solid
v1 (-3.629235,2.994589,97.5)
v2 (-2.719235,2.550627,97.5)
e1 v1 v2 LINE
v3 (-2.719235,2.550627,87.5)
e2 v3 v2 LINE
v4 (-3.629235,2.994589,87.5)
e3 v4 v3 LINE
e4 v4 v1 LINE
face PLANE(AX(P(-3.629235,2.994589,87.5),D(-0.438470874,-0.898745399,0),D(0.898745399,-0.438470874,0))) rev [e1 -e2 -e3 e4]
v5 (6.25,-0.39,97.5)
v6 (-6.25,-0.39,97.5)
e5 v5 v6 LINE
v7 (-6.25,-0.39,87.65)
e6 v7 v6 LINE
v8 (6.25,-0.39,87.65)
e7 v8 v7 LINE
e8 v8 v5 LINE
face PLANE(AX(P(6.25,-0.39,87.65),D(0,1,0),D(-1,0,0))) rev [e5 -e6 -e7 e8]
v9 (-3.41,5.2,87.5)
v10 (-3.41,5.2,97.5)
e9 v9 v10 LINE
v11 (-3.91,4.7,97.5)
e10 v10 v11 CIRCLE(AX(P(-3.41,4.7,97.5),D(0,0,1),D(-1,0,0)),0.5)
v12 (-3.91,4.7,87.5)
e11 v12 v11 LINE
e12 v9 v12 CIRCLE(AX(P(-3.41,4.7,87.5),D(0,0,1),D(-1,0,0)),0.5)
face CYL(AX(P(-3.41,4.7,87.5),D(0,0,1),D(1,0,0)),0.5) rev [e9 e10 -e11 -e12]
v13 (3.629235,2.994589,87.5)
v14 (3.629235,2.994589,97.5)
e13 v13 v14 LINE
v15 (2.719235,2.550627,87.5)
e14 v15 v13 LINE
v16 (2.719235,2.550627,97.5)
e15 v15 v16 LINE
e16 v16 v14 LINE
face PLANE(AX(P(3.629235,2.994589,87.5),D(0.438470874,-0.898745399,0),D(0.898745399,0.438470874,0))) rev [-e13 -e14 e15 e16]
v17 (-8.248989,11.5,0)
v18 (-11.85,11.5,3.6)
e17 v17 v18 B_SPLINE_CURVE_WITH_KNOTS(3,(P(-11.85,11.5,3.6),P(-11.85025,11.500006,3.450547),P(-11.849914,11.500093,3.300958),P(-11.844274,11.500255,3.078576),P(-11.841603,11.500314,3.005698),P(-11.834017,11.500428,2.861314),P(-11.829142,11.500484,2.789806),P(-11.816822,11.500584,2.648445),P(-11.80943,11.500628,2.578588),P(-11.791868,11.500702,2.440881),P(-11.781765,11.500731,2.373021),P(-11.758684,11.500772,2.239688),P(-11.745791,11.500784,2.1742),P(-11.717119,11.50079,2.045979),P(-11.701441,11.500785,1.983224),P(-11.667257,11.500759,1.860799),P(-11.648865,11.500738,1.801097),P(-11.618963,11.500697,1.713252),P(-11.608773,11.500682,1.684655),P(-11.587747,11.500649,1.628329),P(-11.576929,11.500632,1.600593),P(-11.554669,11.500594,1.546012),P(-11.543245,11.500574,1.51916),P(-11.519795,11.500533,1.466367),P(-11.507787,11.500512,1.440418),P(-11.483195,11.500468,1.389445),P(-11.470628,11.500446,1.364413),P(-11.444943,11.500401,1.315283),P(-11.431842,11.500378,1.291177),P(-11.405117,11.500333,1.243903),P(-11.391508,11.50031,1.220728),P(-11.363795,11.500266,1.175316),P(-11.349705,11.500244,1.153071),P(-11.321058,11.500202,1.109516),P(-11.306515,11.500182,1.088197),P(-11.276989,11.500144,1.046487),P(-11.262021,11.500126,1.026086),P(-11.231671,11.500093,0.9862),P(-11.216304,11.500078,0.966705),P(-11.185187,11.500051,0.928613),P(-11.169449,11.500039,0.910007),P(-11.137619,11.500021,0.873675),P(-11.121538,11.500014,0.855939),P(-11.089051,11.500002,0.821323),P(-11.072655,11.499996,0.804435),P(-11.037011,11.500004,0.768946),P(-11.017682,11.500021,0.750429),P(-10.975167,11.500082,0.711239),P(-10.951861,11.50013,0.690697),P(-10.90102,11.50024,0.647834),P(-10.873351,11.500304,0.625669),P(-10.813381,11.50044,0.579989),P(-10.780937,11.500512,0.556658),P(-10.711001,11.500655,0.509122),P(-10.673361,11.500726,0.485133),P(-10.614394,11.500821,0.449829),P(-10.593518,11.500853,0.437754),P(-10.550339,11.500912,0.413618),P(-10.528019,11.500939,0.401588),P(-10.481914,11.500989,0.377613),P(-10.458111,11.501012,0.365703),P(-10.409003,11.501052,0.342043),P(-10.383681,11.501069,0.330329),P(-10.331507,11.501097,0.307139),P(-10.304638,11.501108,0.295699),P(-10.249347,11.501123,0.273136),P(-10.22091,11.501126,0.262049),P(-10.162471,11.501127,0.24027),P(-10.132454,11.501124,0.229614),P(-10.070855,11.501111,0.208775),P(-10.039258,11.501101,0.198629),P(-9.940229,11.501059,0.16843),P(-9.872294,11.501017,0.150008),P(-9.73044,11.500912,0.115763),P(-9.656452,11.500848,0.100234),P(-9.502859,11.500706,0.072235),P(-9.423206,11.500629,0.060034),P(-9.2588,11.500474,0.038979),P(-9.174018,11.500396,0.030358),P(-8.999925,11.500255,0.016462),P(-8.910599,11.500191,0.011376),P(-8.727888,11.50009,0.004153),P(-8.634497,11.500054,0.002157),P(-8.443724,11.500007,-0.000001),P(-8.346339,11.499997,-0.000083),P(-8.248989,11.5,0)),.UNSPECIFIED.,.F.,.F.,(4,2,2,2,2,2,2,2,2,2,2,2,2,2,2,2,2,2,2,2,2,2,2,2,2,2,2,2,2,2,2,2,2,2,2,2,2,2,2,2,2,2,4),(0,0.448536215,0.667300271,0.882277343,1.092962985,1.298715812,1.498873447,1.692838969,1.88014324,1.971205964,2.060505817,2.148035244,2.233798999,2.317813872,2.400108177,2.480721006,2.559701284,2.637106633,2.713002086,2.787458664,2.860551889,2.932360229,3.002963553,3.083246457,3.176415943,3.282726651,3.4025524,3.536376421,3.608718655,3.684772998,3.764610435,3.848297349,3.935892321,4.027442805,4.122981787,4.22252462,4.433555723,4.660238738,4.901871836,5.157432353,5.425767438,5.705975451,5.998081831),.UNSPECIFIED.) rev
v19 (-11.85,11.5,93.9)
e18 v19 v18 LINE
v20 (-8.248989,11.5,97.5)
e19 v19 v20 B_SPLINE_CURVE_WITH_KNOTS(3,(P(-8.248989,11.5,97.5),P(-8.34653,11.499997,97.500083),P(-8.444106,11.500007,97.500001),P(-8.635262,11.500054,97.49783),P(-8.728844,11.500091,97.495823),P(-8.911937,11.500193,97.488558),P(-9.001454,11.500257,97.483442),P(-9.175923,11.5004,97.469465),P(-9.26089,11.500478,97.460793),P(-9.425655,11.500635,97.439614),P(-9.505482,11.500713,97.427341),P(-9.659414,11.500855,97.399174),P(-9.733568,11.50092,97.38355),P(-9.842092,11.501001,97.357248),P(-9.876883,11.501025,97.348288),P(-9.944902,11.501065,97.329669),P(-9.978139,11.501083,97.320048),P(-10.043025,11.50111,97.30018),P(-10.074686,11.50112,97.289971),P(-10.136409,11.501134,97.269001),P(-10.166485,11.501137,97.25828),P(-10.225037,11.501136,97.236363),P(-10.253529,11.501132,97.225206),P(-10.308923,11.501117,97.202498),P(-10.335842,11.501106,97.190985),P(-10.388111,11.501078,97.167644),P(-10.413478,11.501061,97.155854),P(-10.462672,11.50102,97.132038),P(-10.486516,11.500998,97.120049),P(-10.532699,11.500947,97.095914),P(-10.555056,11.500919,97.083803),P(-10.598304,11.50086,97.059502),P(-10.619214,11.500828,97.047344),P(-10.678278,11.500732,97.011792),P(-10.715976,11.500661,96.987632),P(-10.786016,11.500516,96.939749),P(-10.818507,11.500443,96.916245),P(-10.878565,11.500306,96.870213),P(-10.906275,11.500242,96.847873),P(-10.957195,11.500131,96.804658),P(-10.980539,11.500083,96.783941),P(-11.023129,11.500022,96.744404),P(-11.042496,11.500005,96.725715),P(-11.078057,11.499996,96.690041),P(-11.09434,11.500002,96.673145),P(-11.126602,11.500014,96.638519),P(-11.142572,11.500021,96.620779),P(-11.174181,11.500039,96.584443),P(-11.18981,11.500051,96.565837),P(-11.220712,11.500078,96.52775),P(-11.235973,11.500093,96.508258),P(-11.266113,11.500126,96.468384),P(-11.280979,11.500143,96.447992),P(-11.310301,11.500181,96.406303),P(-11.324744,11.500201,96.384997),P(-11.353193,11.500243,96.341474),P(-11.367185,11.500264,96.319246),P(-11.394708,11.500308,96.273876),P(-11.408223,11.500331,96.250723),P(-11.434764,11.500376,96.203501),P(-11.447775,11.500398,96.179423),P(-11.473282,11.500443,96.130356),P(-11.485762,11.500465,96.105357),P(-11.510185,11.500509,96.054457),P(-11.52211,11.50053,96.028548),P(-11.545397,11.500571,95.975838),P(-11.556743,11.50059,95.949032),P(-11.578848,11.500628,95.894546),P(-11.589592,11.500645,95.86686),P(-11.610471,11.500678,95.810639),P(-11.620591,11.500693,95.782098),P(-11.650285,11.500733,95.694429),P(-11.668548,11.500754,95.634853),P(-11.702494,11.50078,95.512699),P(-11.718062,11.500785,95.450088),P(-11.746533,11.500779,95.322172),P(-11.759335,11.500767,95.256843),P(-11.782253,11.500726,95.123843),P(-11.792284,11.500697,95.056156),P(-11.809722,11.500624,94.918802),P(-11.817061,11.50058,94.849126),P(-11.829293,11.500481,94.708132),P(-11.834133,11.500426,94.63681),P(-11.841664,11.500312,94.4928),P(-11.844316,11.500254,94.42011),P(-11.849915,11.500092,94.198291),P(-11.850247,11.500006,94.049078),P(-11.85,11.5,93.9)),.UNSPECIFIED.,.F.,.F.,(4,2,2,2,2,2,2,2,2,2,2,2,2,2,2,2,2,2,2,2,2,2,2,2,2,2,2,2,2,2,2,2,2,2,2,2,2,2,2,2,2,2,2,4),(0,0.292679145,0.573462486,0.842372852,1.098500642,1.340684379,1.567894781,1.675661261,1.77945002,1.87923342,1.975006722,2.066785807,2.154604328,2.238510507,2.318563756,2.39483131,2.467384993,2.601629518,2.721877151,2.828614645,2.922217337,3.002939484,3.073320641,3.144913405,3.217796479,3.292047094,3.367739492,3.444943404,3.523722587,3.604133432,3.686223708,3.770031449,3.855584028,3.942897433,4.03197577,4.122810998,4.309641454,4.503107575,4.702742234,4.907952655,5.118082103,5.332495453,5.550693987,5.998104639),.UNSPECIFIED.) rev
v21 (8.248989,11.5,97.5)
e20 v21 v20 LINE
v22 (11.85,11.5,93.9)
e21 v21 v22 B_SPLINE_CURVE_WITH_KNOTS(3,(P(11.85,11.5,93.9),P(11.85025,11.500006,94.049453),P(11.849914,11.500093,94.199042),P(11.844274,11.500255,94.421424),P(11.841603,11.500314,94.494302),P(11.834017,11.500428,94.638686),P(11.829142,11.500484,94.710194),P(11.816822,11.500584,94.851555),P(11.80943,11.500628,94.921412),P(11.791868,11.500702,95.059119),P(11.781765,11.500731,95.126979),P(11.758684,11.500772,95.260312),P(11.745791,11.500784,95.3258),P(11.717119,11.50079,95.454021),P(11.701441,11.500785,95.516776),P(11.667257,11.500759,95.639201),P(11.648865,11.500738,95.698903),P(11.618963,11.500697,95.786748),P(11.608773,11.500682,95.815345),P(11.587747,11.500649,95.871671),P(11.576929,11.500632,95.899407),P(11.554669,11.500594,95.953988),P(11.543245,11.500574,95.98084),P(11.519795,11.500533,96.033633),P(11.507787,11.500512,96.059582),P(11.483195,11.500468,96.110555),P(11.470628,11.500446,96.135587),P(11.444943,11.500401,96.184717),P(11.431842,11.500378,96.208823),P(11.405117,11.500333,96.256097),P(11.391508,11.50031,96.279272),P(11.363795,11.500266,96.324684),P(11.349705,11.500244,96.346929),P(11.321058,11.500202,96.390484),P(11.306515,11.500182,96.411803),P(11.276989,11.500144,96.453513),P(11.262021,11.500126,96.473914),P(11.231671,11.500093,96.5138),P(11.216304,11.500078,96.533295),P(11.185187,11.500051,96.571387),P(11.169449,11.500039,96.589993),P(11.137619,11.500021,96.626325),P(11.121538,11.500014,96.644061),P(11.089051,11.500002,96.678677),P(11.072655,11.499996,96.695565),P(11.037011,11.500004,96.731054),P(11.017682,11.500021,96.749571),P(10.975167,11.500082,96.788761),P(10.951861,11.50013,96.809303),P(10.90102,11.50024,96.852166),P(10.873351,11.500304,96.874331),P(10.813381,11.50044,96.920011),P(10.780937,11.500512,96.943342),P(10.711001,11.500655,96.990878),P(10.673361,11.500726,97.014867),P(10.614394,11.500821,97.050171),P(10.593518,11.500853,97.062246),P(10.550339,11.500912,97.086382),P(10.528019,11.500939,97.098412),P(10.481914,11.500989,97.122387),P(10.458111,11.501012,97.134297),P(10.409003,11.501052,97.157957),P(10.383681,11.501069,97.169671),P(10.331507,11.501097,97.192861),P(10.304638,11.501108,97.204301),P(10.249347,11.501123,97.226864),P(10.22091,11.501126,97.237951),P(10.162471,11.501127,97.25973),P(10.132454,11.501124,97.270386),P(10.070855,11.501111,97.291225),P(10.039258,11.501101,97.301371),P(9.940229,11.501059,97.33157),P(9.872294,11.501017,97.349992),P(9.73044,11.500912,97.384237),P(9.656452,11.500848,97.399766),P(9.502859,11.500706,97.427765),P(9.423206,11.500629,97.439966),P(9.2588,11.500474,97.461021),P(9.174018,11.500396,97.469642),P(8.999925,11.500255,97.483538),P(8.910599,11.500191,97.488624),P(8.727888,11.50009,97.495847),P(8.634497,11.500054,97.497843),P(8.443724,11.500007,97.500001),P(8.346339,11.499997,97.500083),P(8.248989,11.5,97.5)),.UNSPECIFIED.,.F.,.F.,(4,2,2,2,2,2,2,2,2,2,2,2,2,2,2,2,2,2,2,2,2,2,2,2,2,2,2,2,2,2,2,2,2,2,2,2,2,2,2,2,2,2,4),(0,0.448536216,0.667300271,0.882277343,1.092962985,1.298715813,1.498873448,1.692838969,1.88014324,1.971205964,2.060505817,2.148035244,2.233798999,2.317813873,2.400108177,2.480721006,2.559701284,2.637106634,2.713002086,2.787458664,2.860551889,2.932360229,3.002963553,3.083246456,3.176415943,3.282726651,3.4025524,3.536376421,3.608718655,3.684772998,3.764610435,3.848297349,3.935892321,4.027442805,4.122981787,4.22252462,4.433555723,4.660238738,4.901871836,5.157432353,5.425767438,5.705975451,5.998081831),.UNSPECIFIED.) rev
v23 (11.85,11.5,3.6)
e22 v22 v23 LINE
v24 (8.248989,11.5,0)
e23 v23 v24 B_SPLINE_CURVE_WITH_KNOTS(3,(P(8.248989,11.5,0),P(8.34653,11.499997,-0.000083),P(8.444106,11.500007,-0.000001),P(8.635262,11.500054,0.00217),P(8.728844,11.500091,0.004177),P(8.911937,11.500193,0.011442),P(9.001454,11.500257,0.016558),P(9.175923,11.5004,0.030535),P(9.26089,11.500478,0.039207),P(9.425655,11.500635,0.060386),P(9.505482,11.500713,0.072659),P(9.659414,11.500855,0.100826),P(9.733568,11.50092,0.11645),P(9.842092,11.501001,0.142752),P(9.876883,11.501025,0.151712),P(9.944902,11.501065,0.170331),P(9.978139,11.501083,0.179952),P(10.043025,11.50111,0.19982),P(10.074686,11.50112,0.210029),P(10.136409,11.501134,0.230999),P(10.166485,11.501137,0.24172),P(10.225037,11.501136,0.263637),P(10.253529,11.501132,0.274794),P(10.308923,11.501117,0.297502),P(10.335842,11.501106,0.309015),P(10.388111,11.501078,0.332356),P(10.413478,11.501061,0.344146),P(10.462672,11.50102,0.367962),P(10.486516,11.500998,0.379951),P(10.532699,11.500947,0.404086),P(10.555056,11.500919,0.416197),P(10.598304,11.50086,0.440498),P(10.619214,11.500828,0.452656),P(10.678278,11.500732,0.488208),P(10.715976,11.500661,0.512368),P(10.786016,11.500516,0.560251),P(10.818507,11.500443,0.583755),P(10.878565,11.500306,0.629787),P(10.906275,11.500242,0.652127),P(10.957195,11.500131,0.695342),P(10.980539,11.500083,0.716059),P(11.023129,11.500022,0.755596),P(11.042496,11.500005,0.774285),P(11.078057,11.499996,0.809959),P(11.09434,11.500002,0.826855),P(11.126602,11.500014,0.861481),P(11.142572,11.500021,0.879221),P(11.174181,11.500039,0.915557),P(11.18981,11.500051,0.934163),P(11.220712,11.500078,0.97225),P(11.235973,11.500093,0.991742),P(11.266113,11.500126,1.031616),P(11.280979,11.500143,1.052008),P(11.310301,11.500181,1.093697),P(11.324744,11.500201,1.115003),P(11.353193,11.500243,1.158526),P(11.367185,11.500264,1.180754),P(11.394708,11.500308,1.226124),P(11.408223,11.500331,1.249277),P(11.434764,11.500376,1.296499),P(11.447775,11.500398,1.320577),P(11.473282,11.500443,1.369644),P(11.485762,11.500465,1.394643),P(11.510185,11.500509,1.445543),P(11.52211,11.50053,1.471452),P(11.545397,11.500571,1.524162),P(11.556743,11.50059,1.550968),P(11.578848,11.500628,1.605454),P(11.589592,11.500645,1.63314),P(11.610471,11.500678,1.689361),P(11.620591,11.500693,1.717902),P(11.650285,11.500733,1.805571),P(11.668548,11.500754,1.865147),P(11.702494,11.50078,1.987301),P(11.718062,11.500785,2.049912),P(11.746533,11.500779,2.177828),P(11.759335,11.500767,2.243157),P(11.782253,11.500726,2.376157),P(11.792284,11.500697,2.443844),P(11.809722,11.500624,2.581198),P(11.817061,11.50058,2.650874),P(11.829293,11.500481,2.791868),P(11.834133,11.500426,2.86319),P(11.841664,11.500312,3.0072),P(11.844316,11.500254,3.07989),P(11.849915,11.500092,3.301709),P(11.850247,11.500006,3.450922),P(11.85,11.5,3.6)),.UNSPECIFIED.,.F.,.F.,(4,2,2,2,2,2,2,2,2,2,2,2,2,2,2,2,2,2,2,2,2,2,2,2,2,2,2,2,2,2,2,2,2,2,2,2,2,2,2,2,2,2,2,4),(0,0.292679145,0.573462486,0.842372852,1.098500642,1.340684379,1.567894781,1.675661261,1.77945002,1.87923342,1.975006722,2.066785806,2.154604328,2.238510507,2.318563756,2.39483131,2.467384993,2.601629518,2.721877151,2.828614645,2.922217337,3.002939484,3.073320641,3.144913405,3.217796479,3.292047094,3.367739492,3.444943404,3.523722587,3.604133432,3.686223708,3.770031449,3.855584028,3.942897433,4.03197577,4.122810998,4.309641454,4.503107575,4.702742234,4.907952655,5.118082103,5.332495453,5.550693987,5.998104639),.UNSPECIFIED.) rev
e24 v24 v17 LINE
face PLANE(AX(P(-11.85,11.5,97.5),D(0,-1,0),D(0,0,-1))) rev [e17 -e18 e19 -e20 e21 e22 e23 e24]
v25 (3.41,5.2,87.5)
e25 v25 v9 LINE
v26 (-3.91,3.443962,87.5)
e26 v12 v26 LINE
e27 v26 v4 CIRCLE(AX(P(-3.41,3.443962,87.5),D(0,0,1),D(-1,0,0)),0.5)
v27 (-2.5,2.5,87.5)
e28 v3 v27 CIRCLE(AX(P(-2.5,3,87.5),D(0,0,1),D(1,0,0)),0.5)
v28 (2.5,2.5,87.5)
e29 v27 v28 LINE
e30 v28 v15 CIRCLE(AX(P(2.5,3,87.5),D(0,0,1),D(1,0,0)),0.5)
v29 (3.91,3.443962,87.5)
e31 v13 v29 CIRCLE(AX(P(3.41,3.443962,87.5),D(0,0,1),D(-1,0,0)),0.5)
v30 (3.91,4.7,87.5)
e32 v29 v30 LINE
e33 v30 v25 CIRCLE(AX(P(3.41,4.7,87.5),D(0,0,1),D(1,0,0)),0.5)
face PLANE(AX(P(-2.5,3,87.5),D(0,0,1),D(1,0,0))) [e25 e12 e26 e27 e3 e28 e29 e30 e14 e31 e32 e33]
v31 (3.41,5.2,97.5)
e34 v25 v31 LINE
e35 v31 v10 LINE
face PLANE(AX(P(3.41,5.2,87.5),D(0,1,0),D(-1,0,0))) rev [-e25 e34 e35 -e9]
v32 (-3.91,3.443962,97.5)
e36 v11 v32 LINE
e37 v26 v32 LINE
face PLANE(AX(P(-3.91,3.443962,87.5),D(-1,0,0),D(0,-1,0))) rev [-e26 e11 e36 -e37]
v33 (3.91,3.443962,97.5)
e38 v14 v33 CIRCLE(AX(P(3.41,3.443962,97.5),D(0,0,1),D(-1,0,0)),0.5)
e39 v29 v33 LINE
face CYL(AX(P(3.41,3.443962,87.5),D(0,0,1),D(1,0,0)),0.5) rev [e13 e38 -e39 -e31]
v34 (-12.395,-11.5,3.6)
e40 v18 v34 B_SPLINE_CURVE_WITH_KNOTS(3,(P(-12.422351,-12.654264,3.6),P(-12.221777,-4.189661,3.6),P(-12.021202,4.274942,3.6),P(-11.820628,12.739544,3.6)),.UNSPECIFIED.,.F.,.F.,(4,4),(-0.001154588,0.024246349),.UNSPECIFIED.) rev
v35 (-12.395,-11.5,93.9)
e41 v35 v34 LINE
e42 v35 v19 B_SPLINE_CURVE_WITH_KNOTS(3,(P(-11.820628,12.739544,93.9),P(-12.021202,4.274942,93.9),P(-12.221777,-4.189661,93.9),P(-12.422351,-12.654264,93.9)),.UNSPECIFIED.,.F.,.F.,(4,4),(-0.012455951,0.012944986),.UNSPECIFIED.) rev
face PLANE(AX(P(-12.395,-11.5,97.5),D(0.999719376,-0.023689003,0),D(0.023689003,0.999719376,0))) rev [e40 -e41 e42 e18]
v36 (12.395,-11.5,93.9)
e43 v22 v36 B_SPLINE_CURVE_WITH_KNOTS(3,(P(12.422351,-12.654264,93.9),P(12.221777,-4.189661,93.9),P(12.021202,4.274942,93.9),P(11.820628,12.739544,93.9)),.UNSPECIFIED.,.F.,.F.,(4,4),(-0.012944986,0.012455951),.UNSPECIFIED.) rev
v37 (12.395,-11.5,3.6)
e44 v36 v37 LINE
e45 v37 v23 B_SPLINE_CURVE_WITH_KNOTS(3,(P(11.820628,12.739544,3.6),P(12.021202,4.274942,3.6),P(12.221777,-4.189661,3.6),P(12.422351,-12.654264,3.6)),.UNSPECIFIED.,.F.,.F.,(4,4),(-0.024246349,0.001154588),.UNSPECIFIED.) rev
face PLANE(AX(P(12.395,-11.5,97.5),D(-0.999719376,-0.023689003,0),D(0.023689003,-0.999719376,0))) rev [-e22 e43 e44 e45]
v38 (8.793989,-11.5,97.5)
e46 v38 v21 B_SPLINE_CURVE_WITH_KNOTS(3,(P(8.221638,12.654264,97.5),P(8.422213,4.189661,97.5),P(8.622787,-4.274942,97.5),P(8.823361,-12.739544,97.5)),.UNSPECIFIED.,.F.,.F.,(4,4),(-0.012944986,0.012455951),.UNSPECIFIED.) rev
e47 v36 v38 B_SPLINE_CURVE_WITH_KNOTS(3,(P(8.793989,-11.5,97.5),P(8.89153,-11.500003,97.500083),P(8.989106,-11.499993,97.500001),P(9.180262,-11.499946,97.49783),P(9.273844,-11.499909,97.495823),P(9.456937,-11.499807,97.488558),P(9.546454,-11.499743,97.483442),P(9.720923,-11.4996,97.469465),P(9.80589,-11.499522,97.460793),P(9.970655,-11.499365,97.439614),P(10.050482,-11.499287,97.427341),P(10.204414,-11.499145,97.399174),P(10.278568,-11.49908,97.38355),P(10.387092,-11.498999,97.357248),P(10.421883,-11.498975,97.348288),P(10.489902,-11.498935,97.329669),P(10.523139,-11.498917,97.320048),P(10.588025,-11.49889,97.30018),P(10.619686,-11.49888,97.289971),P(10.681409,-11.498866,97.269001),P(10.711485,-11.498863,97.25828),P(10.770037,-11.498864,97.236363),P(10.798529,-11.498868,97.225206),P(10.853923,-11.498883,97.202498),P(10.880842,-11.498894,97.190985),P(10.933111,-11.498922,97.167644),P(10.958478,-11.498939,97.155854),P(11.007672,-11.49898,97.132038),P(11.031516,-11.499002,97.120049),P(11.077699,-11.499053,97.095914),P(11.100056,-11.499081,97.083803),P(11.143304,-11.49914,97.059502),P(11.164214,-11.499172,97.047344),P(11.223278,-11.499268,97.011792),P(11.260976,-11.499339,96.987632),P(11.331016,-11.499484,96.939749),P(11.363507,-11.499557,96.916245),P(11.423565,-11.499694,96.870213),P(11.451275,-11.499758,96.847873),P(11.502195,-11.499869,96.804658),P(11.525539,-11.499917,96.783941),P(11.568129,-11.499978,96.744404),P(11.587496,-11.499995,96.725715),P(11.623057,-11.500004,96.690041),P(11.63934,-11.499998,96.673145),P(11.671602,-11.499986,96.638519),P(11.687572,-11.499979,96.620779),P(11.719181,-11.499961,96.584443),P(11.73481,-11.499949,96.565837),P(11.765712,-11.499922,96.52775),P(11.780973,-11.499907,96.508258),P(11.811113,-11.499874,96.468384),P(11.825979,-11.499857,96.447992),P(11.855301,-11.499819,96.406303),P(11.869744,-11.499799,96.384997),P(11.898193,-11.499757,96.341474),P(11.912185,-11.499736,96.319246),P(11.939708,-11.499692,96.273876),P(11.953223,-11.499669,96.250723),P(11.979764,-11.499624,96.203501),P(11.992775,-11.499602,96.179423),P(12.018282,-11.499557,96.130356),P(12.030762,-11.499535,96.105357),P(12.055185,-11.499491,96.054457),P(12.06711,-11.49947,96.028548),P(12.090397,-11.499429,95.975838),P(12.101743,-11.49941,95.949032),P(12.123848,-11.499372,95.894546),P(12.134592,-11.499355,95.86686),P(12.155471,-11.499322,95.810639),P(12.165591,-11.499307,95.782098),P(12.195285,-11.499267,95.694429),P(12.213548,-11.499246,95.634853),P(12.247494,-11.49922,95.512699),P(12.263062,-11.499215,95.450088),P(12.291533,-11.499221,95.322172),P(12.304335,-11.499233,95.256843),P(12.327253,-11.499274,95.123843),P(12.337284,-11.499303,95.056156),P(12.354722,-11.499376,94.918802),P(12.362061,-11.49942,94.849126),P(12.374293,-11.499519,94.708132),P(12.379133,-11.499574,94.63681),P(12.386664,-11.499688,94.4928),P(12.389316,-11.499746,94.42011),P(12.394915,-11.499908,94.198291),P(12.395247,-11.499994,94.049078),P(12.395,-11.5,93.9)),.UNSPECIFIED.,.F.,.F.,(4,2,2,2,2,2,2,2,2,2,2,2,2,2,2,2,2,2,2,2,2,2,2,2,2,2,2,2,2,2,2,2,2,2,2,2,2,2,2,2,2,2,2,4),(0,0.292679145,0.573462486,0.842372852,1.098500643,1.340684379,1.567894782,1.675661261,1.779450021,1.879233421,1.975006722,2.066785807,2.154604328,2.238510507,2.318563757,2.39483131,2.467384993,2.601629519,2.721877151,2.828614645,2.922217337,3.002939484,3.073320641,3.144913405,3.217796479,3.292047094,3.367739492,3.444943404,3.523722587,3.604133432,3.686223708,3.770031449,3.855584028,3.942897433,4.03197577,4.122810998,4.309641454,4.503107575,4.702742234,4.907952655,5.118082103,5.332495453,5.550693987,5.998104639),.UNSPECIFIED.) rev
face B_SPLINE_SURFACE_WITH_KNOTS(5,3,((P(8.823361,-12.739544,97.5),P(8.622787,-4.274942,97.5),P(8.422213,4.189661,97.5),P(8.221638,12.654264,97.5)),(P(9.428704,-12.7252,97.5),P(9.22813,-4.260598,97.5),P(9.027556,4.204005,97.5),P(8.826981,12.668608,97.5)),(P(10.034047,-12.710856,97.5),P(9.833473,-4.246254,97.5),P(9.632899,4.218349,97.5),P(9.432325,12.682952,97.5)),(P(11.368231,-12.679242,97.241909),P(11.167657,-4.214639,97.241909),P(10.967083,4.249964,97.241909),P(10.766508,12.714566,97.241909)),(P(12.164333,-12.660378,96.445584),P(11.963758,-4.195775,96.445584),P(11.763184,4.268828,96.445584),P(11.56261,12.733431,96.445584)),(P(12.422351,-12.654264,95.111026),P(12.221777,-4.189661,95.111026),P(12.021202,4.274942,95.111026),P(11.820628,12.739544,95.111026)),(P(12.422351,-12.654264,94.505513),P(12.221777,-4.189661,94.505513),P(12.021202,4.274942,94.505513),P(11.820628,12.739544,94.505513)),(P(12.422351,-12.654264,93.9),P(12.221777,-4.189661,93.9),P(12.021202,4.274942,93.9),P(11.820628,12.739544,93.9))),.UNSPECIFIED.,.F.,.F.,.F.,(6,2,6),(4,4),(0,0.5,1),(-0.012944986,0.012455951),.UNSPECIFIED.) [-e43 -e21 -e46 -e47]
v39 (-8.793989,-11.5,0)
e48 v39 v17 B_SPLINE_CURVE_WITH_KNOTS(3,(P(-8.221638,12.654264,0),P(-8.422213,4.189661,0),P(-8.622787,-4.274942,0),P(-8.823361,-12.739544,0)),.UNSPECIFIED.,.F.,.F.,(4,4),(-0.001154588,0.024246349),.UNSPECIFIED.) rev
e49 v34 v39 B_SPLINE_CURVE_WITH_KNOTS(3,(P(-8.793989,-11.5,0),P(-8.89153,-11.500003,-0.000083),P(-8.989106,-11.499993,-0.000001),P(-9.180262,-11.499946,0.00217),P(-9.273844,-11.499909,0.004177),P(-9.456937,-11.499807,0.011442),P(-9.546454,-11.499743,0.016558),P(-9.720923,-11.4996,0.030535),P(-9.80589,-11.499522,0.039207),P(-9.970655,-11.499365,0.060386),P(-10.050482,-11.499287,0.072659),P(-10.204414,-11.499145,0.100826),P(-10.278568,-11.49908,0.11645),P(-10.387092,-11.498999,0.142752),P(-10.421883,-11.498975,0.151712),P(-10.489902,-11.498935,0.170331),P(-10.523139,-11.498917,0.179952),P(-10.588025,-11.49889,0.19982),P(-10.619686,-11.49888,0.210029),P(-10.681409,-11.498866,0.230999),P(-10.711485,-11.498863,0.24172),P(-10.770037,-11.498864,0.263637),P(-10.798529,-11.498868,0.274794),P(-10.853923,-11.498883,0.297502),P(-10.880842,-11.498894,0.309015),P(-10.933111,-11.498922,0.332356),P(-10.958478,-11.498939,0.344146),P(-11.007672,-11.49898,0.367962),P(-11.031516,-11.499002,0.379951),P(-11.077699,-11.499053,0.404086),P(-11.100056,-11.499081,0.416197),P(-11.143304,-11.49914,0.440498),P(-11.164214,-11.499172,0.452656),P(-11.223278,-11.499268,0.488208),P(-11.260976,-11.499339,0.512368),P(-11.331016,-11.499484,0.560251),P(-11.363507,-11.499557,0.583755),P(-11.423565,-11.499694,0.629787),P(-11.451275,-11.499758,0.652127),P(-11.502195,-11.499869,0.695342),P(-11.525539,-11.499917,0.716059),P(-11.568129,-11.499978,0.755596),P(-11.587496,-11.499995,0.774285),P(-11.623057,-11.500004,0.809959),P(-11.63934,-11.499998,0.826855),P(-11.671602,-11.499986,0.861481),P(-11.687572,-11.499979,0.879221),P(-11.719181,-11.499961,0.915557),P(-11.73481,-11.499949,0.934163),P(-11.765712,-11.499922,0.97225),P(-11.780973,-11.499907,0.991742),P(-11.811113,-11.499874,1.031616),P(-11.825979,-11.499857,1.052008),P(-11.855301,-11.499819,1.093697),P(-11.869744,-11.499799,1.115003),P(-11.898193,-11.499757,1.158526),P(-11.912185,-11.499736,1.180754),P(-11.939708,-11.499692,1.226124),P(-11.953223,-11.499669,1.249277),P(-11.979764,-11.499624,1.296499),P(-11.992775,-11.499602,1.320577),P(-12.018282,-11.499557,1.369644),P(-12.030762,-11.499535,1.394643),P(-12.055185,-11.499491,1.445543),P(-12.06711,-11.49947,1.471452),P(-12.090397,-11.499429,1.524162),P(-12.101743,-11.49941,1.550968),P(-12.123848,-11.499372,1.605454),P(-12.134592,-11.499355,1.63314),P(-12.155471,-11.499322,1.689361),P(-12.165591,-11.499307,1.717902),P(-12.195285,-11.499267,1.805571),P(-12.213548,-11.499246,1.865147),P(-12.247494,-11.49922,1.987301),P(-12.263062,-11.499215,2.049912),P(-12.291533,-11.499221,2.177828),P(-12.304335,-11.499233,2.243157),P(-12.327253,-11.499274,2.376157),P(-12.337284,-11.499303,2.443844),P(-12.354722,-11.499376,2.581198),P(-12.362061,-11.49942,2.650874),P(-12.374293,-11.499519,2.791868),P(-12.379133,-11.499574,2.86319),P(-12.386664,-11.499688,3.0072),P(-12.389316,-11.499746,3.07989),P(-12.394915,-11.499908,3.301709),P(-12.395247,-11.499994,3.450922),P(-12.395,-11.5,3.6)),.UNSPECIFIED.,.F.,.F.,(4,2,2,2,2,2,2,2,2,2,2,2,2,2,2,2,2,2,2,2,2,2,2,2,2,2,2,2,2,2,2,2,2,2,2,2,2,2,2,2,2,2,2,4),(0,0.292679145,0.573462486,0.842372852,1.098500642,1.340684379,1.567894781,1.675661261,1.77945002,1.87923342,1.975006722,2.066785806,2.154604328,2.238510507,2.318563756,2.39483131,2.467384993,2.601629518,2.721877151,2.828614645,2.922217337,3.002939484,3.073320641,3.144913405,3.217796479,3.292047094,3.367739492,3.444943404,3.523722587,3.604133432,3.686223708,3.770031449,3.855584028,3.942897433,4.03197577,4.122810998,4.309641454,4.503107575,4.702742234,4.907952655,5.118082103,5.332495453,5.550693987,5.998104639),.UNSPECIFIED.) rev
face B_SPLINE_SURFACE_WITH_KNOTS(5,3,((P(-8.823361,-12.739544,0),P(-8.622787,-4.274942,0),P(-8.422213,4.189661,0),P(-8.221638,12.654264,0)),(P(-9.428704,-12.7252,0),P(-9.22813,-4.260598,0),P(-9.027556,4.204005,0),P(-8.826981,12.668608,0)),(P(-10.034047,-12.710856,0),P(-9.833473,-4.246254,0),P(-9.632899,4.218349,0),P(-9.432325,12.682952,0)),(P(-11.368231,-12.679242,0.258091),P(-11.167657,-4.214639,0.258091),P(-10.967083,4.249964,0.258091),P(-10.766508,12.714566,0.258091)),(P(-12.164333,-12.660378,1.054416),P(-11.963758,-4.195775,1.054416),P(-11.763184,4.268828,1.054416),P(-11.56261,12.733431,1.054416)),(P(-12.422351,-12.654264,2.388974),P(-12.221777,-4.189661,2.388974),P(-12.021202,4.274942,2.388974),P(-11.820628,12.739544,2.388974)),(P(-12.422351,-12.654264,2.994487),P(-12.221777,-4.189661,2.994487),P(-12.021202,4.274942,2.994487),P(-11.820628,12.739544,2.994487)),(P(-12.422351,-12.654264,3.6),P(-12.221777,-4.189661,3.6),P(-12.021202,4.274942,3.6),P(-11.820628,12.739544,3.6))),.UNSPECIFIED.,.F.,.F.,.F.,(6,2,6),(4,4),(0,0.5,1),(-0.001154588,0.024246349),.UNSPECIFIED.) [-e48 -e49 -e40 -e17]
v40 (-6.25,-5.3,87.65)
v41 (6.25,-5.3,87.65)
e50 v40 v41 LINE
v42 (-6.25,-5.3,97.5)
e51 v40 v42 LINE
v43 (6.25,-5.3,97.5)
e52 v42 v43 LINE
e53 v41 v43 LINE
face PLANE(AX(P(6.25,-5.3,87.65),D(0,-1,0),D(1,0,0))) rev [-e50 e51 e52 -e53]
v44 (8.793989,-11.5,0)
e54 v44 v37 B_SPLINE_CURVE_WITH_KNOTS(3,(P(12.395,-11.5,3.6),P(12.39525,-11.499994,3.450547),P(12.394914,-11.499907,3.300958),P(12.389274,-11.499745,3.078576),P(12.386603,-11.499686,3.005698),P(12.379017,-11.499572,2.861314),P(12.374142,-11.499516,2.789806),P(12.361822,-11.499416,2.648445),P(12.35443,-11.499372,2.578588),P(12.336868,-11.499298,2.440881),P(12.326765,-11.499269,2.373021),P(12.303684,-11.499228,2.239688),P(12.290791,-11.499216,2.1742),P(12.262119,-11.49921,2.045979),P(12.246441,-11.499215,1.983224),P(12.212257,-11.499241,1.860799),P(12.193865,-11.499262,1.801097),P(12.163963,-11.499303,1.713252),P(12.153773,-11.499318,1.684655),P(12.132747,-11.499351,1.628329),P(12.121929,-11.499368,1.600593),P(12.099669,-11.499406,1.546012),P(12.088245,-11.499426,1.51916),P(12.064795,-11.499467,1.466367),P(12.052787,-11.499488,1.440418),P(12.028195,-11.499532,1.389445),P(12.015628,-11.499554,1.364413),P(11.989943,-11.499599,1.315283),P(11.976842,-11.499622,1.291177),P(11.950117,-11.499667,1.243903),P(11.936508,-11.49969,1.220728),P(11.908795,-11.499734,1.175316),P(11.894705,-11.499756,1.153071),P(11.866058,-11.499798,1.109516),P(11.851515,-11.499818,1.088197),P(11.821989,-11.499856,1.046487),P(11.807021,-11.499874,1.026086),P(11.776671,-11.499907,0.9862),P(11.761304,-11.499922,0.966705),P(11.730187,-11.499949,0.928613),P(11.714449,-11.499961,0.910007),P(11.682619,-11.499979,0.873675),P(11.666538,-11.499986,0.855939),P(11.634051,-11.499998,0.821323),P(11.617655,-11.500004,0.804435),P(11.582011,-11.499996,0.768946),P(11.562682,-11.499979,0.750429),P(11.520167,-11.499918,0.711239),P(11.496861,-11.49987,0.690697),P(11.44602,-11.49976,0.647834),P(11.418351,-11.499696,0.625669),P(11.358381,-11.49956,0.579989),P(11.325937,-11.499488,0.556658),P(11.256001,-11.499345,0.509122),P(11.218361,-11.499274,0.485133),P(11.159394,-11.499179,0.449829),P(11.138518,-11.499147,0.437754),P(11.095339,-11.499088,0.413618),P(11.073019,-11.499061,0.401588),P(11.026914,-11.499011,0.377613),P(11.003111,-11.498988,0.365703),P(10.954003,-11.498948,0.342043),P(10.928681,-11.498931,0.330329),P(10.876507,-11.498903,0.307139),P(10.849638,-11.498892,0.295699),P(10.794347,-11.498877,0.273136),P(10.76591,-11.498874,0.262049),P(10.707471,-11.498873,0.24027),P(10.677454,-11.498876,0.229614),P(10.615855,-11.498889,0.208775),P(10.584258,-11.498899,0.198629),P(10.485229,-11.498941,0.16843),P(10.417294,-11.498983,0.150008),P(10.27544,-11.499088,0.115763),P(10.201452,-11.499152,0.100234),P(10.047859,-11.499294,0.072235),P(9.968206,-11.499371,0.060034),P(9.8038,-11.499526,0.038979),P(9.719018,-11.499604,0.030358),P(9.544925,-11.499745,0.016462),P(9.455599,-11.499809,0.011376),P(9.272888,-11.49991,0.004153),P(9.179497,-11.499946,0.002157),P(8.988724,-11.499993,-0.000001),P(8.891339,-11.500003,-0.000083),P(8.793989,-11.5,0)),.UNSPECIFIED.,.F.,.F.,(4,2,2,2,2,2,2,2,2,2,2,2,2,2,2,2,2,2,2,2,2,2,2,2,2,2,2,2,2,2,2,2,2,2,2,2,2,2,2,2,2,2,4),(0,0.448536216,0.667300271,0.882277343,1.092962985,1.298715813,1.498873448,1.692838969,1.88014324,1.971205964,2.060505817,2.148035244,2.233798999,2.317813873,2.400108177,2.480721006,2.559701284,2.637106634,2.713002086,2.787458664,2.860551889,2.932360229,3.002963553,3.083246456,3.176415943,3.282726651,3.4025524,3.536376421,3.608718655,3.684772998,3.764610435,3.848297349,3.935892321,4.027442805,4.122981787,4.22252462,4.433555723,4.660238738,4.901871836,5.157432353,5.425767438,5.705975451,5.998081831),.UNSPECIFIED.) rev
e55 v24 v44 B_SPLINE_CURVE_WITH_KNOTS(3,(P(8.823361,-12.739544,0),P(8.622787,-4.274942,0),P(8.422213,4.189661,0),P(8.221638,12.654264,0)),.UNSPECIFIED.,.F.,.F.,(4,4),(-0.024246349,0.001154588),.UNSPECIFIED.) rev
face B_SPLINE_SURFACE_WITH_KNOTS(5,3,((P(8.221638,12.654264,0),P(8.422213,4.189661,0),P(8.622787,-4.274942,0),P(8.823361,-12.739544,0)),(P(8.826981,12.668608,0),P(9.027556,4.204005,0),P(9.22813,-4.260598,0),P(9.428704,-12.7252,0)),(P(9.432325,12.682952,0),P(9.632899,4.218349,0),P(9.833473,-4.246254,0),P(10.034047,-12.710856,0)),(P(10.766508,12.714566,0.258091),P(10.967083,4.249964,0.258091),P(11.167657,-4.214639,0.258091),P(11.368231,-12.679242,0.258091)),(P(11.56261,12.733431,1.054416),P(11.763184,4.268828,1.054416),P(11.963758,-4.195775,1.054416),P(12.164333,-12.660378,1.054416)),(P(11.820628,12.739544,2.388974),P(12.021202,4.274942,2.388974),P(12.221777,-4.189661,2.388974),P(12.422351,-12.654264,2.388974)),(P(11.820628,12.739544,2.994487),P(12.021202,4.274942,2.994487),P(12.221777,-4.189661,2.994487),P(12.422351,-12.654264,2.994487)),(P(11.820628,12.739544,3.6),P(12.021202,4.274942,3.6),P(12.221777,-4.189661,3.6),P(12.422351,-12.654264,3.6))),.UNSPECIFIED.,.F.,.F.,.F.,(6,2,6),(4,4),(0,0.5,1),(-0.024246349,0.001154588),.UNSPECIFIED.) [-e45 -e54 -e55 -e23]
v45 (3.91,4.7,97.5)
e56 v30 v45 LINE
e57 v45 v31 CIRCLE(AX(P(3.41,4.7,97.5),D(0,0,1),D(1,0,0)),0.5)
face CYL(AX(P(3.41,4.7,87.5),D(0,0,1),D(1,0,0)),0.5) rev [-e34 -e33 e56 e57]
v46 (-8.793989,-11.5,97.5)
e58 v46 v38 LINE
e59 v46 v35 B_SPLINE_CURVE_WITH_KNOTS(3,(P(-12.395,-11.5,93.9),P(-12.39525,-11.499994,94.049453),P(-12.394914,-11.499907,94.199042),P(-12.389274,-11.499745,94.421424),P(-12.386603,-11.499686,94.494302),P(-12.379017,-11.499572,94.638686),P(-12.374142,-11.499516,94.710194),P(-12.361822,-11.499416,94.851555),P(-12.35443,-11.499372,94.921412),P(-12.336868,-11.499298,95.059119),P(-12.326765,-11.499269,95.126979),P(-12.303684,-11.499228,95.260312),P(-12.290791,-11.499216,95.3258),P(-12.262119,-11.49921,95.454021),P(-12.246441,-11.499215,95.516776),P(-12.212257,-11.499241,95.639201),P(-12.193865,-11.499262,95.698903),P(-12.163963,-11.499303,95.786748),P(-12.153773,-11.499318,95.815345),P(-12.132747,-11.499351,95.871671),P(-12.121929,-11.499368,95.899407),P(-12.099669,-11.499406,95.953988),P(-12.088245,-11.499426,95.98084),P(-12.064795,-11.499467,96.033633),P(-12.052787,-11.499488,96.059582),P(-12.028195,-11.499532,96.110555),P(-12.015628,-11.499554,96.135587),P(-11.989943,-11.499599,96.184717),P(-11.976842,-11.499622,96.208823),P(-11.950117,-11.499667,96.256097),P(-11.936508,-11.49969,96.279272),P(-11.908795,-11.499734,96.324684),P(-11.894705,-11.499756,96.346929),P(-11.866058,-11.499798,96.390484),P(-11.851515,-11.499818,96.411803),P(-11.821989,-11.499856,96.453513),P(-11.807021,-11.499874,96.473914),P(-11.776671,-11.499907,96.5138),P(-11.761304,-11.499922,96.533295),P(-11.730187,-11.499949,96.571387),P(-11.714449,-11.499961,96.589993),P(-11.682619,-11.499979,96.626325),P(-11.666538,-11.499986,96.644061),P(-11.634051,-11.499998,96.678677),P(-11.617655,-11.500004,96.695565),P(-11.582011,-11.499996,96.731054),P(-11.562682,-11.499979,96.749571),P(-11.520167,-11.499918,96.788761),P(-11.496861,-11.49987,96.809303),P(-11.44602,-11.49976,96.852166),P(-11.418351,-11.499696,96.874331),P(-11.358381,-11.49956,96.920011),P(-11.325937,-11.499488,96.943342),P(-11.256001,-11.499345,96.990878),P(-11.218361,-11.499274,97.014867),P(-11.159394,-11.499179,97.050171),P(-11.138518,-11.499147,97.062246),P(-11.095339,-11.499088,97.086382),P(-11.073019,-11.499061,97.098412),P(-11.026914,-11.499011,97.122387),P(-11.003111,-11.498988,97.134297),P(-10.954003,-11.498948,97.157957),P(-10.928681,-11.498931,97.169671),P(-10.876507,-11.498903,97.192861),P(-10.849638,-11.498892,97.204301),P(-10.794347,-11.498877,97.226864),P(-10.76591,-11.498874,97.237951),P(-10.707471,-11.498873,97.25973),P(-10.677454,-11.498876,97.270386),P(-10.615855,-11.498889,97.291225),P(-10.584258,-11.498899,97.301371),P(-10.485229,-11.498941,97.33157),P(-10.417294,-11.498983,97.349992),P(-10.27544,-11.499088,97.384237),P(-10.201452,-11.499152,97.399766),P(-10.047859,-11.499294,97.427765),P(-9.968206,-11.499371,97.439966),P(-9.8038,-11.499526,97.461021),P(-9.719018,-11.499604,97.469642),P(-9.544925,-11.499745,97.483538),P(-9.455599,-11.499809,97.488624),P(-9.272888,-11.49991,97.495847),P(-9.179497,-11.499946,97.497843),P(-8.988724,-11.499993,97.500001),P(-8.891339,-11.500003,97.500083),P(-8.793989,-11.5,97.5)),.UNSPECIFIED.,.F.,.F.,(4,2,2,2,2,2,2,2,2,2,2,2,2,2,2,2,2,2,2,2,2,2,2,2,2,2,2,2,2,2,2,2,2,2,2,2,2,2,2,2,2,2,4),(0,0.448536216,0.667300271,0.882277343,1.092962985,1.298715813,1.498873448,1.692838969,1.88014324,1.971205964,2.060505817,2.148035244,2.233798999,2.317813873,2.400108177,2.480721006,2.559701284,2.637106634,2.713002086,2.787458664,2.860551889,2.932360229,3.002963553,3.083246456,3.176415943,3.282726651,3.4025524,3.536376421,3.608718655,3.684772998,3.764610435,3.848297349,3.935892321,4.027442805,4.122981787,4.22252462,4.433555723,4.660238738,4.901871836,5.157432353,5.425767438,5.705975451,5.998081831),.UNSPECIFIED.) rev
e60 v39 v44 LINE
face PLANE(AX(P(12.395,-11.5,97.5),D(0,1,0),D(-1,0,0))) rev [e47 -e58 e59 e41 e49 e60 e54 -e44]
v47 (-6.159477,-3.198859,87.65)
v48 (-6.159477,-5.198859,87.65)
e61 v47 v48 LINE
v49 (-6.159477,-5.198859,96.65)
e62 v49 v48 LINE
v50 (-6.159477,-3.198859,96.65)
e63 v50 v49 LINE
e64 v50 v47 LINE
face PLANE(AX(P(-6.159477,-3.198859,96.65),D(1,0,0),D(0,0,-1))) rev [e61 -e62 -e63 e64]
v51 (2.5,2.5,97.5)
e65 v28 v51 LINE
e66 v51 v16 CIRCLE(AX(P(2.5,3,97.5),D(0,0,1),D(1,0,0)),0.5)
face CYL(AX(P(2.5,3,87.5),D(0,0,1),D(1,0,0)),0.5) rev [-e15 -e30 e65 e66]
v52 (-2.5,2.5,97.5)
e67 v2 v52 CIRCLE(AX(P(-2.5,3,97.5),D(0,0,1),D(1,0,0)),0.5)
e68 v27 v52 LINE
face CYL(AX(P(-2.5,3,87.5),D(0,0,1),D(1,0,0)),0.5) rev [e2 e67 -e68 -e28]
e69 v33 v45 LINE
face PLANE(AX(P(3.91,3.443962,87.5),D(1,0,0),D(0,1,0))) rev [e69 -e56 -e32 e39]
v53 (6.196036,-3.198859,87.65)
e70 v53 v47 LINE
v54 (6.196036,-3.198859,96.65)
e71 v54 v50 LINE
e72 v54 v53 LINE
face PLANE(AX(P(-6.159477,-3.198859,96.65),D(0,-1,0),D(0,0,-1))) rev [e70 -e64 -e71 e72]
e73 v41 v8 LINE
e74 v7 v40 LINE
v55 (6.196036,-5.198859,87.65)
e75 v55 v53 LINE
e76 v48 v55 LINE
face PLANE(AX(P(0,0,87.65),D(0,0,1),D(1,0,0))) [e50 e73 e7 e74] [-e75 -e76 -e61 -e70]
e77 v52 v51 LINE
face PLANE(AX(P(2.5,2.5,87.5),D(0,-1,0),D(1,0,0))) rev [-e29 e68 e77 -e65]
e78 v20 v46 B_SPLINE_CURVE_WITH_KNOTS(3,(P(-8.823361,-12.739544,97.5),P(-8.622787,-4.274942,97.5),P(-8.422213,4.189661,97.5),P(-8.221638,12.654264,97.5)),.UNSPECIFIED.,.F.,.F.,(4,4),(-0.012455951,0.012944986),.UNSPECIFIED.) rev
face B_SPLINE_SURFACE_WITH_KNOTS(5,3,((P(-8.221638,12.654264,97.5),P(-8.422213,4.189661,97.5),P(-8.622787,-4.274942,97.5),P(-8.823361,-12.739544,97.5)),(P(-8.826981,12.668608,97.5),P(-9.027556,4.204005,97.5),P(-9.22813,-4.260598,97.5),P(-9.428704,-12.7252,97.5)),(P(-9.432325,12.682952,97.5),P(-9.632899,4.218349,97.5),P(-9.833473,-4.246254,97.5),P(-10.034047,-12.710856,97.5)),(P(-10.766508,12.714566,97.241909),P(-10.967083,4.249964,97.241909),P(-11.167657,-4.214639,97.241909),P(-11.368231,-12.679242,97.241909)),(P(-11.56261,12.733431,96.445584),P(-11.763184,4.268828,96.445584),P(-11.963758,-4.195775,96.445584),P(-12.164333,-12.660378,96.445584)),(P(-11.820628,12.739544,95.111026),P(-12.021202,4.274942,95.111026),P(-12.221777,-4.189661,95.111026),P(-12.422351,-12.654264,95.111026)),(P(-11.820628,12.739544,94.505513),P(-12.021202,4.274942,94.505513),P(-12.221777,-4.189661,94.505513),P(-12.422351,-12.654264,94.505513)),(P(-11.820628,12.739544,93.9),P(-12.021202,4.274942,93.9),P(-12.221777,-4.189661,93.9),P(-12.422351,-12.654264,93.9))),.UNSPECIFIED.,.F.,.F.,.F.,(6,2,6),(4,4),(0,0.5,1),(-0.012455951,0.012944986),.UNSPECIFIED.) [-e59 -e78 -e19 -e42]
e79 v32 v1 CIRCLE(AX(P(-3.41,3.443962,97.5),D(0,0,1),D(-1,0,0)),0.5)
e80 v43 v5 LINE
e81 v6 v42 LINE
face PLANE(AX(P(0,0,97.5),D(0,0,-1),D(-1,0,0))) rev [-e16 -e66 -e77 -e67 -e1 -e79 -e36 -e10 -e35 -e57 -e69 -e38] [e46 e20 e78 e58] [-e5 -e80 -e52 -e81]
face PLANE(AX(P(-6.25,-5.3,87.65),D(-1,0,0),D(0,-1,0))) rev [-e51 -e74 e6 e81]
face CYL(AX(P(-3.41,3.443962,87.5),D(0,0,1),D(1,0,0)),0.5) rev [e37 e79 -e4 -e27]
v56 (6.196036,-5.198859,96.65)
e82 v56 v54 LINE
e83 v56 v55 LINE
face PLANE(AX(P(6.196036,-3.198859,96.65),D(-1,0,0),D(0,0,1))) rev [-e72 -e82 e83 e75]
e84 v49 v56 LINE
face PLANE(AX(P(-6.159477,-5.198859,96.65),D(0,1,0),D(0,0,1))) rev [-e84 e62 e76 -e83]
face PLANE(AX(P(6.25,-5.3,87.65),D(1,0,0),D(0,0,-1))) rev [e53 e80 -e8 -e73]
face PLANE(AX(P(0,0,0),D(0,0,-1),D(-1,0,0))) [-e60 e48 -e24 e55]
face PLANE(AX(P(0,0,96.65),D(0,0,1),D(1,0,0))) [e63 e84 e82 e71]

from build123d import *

# Parameters (mm, degrees)
BOSS_EXTRUDE2_DEPTH = 97.5
FILLET4_SIZE        = 3.6
SKETCH2_W           = 12.5
SKETCH2_H           = 4.91
CUT_EXTRUDE1_DEPTH  = 9.85
CUT_EXTRUDE2_DEPTH  = 10
SKETCH4_W           = 12.355512527
SKETCH4_H           = 2
BOSS_EXTRUDE3_DEPTH = 9


with BuildPart() as part:
    # Sketch1 → Boss-Extrude2 (new body)
    with BuildSketch(Plane.XY):
        Polygon((12.395, -11.5), (-12.395, -11.5), (-11.85, 11.5), (11.85, 11.5), align=None)
    extrude(amount=BOSS_EXTRUDE2_DEPTH)

    # Fillet4
    # a fillet whose section is not a circle: 3.6 mm, written as the material it takes off along each edge
    with BuildSketch(Plane(origin=(-12.608201023, -20.497474386, 0), x_dir=(0, 0, 1), z_dir=(0.023689002610023418, 0.9997193762028135, 0)), Plane(origin=(11.636798977, 20.497474386, 0), x_dir=(0, 0, 1), z_dir=(0.023689002610022953, -0.9997193762028134, 0))) as fillet4_piece_1:
        with BuildLine():
            add(Edge.make_bspline([(FILLET4_SIZE, 0), (FILLET4_SIZE * 0.831801948466, 0), (FILLET4_SIZE * 0.663603896932, 0), (FILLET4_SIZE * 0.292893218813, FILLET4_SIZE * 0.0716919198361), (FILLET4_SIZE * 0.0716919198361, FILLET4_SIZE * 0.292893218813), (0, FILLET4_SIZE * 0.663603896932), (0, FILLET4_SIZE * 0.831801948466), (0, FILLET4_SIZE)], knots=[0, 0, 0, 0, 0, 0, 0.5, 0.5, 1, 1, 1, 1, 1, 1], degree=5))
            Line((0, FILLET4_SIZE), (0, 0))
            Line((0, 0), (FILLET4_SIZE, 0))
        make_face()
    extrude(amount=41.006456159, mode=Mode.SUBTRACT)
    with BuildSketch(Plane(origin=(-12.608201023, -20.497474386, 97.5), x_dir=(0, 0, -1), z_dir=(0.023689002610023418, 0.9997193762028135, 0)), Plane(origin=(11.636798977, 20.497474386, 97.5), x_dir=(0, 0, -1), z_dir=(0.023689002610022953, -0.9997193762028134, 0))) as fillet4_piece_2:
        with BuildLine():
            add(Edge.make_bspline([(FILLET4_SIZE, 0), (FILLET4_SIZE * 0.831801948466, 0), (FILLET4_SIZE * 0.663603896932, 0), (FILLET4_SIZE * 0.292893218813, -FILLET4_SIZE * 0.0716919198361), (FILLET4_SIZE * 0.0716919198361, -FILLET4_SIZE * 0.292893218813), (0, -FILLET4_SIZE * 0.663603896932), (0, -FILLET4_SIZE * 0.831801948466), (0, -FILLET4_SIZE)], knots=[0, 0, 0, 0, 0, 0, 0.5, 0.5, 1, 1, 1, 1, 1, 1], degree=5))
            Line((0, -FILLET4_SIZE), (0, 0))
            Line((0, 0), (FILLET4_SIZE, 0))
        make_face()
    extrude(amount=41.006456159, mode=Mode.SUBTRACT)

    # Sketch2 → Cut-Extrude1 (cut)
    with BuildSketch(Plane.XY.offset(97.5)):
        with Locations((0, -2.845)):
            Rectangle(SKETCH2_W, SKETCH2_H)
    extrude(amount=-CUT_EXTRUDE1_DEPTH, mode=Mode.SUBTRACT)

    # Sketch3 → Cut-Extrude2 (cut)
    with BuildSketch(Plane.XY.offset(97.5)):
        with BuildLine():
            Line((-3.629235437, 2.994588956), (-2.719235437, 2.5506273))
            ThreePointArc((-2.719235437, 2.5506273), (-2.612502556, 2.512821208), (-2.5, 2.5))
            Line((-2.5, 2.5), (2.5, 2.5))
            ThreePointArc((2.5, 2.5), (2.612502556, 2.512821208), (2.719235437, 2.5506273))
            Line((2.719235437, 2.5506273), (3.629235437, 2.994588956))
            ThreePointArc((3.629235437, 2.994588956), (3.834038747, 3.179025548), (3.91, 3.443961655))
            Line((3.91, 3.443961655), (3.91, 4.7))
            ThreePointArc((3.91, 4.7), (3.763553391, 5.053553391), (3.41, 5.2))
            Line((3.41, 5.2), (-3.41, 5.2))
            ThreePointArc((-3.41, 5.2), (-3.763553391, 5.053553391), (-3.91, 4.7))
            Line((-3.91, 4.7), (-3.91, 3.443961655))
            ThreePointArc((-3.91, 3.443961655), (-3.834038747, 3.179025548), (-3.629235437, 2.994588956))
        make_face()
    extrude(amount=-CUT_EXTRUDE2_DEPTH, mode=Mode.SUBTRACT)

    # Sketch4 → Boss-Extrude3 (add)
    with BuildSketch(Plane.XY.offset(87.65)):
        with Locations((0.018279413, -4.198858777)):
            Rectangle(SKETCH4_W, SKETCH4_H)
    extrude(amount=BOSS_EXTRUDE3_DEPTH)


solid = part.part
